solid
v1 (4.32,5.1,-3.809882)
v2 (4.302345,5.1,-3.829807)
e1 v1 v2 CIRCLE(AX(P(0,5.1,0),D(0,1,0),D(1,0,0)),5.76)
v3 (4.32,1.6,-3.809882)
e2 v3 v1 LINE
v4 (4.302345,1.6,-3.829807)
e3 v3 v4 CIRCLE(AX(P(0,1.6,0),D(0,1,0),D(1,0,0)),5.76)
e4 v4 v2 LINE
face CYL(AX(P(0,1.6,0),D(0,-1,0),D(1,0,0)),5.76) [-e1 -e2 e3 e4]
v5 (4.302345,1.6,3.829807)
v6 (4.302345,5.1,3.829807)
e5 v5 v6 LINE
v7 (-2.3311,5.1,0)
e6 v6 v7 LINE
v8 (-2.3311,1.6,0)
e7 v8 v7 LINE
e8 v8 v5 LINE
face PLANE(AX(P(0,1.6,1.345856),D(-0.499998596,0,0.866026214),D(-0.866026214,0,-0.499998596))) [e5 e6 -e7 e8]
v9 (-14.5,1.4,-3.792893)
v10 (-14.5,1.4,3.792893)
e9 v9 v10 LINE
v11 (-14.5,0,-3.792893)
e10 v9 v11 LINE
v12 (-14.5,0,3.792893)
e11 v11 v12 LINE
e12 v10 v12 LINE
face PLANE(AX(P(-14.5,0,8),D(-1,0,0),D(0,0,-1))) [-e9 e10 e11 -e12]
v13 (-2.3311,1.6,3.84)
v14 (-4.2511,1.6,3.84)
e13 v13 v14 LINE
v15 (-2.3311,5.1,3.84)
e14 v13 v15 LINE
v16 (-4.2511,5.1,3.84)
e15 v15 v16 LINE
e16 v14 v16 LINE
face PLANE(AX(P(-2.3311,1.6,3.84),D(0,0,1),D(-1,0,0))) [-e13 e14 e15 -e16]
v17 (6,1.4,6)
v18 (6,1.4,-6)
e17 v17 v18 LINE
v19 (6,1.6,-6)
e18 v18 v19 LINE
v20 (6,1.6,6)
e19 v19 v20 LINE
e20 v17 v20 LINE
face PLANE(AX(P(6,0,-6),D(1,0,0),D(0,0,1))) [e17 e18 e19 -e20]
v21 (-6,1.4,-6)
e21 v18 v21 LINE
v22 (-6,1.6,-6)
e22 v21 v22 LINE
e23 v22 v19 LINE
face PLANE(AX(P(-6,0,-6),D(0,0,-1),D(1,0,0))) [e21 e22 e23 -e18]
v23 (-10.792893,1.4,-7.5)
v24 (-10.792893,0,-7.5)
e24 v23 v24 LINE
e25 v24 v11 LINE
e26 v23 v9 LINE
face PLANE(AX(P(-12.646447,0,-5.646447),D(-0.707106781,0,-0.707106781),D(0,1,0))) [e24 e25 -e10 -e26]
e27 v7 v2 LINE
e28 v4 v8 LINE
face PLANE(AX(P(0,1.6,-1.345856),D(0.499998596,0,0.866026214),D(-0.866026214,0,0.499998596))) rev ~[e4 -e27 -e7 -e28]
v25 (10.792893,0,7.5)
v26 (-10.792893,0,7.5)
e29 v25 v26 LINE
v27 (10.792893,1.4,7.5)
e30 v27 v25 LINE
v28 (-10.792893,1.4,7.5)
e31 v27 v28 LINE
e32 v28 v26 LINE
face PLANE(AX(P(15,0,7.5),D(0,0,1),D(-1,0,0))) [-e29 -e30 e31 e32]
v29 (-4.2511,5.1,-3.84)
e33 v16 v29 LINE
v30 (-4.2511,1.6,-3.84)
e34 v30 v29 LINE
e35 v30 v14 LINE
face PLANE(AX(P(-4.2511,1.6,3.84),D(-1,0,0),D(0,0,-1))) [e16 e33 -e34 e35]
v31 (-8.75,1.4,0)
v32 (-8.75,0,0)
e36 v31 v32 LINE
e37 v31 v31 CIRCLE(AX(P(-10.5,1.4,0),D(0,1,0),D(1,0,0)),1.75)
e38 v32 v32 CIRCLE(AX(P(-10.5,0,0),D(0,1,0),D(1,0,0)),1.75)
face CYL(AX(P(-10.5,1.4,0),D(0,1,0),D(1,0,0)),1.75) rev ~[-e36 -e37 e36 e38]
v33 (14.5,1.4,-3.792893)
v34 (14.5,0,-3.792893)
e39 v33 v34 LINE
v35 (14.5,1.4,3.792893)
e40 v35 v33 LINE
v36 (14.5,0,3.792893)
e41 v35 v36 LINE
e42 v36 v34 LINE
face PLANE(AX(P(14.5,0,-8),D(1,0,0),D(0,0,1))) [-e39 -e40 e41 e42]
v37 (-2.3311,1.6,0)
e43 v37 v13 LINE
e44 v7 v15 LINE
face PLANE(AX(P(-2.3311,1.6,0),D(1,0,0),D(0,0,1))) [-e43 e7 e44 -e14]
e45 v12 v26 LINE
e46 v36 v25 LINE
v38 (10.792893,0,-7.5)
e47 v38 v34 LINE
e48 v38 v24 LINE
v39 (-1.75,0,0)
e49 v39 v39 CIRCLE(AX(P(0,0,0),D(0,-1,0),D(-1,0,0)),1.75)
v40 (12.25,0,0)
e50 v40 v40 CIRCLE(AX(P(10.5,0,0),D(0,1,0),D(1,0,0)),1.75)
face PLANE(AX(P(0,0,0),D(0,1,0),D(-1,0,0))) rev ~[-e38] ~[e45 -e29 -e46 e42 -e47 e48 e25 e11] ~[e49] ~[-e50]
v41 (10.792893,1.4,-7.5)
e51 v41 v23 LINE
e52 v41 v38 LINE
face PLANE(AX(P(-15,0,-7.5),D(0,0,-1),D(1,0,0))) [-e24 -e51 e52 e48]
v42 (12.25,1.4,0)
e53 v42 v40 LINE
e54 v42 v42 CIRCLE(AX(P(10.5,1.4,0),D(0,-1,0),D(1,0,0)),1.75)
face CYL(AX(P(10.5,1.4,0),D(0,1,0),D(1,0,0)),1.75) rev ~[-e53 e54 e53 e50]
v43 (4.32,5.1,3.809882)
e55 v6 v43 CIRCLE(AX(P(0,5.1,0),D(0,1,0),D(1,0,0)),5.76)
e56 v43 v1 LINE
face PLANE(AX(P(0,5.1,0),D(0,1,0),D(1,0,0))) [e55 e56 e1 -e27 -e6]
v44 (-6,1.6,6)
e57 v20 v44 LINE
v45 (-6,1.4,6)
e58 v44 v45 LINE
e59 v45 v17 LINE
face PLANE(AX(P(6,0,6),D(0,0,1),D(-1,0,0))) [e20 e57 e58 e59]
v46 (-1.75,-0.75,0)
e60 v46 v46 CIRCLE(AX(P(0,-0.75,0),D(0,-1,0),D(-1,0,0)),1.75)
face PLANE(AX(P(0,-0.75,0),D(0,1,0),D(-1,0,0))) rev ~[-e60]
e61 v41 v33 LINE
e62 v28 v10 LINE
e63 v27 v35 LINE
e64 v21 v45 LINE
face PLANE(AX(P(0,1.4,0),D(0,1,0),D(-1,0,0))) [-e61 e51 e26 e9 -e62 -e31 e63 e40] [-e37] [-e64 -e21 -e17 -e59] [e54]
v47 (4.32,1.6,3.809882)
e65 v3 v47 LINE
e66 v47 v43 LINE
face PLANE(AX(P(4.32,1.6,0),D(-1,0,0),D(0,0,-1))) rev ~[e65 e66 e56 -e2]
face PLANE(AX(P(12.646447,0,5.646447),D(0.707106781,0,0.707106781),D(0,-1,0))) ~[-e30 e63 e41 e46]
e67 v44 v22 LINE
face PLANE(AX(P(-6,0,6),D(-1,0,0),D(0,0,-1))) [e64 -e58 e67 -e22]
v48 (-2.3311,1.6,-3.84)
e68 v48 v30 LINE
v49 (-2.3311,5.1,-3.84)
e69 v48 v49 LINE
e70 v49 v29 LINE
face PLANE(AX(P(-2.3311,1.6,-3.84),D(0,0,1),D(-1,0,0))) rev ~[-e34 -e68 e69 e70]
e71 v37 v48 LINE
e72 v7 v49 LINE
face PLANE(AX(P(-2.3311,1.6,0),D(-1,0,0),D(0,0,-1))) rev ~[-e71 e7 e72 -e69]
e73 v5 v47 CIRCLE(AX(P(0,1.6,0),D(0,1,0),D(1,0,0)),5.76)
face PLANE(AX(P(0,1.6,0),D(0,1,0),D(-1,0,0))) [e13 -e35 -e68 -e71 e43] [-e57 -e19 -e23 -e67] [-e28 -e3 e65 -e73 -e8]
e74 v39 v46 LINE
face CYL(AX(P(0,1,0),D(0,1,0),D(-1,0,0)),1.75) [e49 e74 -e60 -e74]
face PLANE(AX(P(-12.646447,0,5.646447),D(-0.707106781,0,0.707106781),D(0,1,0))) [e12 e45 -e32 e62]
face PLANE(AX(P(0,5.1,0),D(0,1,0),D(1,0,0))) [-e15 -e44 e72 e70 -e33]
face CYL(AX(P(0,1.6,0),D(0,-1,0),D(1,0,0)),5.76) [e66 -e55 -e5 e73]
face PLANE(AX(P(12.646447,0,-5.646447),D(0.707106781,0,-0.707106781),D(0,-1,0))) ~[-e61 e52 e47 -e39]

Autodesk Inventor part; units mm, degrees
ref_plane "YZ Plane" through (0, 0, 0) normal (1, 0, 0) x (0, 1, 0)
ref_plane "XZ Plane" through (0, 0, 0) normal (0, 1, 0) x (-1, 0, 0)
ref_plane "XY Plane" through (0, 0, 0) normal (0, 0, 1) x (1, 0, 0)
sketch "Szkic1" plane through (0, 0, 0) normal (0, 1, 0) x (-1, 0, 0)
  line L0 (-15, 8) -> (15, 8)
  line L1 (15, 8) -> (15, -8)
  line L2 (15, -8) -> (-15, -8)
  line L3 (-15, -8) -> (-15, 8)
  line L4 (-15, 8) -> (15, -8) construction
  line L5 (15, 8) -> (-15, -8) construction
  line L6 (-6, 6) -> (6, 6)
  line L7 (6, 6) -> (6, -6)
  line L8 (6, -6) -> (-6, -6)
  line L9 (-6, -6) -> (-6, 6)
  line L10 (-6, 6) -> (6, -6) construction
  line L11 (6, 6) -> (-6, -6) construction
  circle A0 centre (0, 0) radius 1.75
  dimension "d0" = 30
  dimension "d1" = 16
  dimension "d2" = 12
  dimension "d3" = 12
  dimension "d4" = 3.5
extrude "Wyciągnięcie proste1" add sketch "Szkic1" along normal blind 1.4 contours L0 L1 L2 L3 | L6 L7 L8 L9 | A0
extrude "Wyciągnięcie proste2" add sketch "Szkic1" along normal blind 1.6 contours L6 L7 L8 L9 | A0
extrude "Wyciągnięcie proste3" cut sketch "Szkic1" along normal blind 1 contours A0
chamfer "Faza1" distance 4 angle 45 4 edges at (15, 0.7, 8) (15, 0.7, -8) (-15, 0.7, 8) (-15, 0.7, -8)
offset faces "Rozmiar1" outward -0.5 faces at (-3.6667, 0.4667, 8) (-12.3333, 0.4667, 6.6667) (12.3333, 0.4667, 6.6667) (15, 0.4667, 1.3333) (13.6667, 0.4667, -5.3333) (3.6667, 0.4667, -8) (-13.6667, 0.4667, -5.3333) (-15, 0.4667, -1.3333)
sketch "Szkic2" plane through (0, 1.4, 0) normal (0, 1, 0) x (1, 0, 0)
  line L0 (-6, -6) -> (6, -6) projected
  line L1 (-6, 6) -> (6, 6) projected
  line L2 (-6, -6) -> (6, -6)
  line L3 (6, -6) -> (6, 6)
  line L4 (6, 6) -> (-6, 6)
  line L5 (-6, 6) -> (-6, -6)
  line L6 (0, 0) -> (-10.5, 0)
  line L7 (-10.5, 0) -> (10.5, 0)
  circle A0 centre (10.5, 0) radius 1.75
  circle A1 centre (-10.5, 0) radius 1.75
  dimension "d16" = 10.5
  dimension "d17" = 21
  dimension "d18" = 3.5
  dimension "d19" = 3.5
extrude "Wyciągnięcie proste4" cut sketch "Szkic2" against normal blind 10 contours A0 | A1
sketch "Szkic4" plane through (0, 1.6, 0) normal (0, 1, 0) x (1, 0, 0)
  line L0 (-4.2511, -3.84) -> (-4.2511, 0)
  line L1 (5.76, 0) -> (4.32, 0)
  line L2 (-2.3311, 0) -> (-2.3311, 3.84)
  line L3 (4.32, 0) -> (4.32, 3.84)
  line L4 (0, -5.76) -> (0, 5.76)
  line L5 (0, 5.76) -> (0, -5.76)
  line L6 (5.76, -5.76) -> (-5.76, -5.76)
  line L7 (-5.76, -5.76) -> (5.76, -5.76)
  line L8 (4.32, 3.84) -> (-2.3311, 0)
  line L9 (5.76, -5.76) -> (5.76, 5.76)
  line L10 (5.76, 5.76) -> (5.76, -5.76)
  line L11 (5.76, 0) -> (-5.76, 0)
  line L12 (5.76, 5.76) -> (-5.76, 5.76)
  line L13 (-5.76, 5.76) -> (5.76, 5.76)
  line L14 (5.76, 5.76) -> (-5.76, 5.76)
  circle A0 centre (0, 0) radius 5.76
  line L15 (-5.76, -5.76) -> (-5.76, 5.76)
  line L16 (-5.76, 5.76) -> (-5.76, -5.76)
  line L17 (-5.76, 5.76) -> (-5.76, -5.76)
  line L18 (4.32, 0) -> (4.32, -3.84)
  line L19 (4.32, -3.84) -> (-2.3311, 0)
  line L20 (-2.3311, 0) -> (-2.3311, -3.84)
  line L21 (-4.2511, 3.84) -> (-4.2511, 0)
  line L22 (-2.3311, -3.84) -> (-4.2511, -3.84)
  line L23 (-2.3311, 3.84) -> (-4.2511, 3.84)
  line L24 (6, -6) -> (-6, -6) projected
  line L25 (6, 6) -> (-6, 6) projected
  line L26 (5.76, -5.76) -> (-5.76, -5.76)
  line L27 (-5.76, -5.76) -> (-5.76, 5.76)
  line L28 (-5.76, 5.76) -> (5.76, 5.76)
  line L29 (5.76, 5.76) -> (5.76, -5.76)
  point P0 (-16.6045, -17.9068)
  point P1 (5.76, -5.76)
  point P2 (-5.76, -5.76)
  point P3 (4.32, 3.8099)
  point P4 (4.3023, 3.8298)
  point P5 (4.3023, -3.8298)
  point P6 (4.32, -3.8099)
extrude "Wyciągnięcie proste5" add sketch "Szkic4" along normal blind 3.5 contours L0 L11 L20 L22 | L21 L23 L2 L11 | L8 L4 L11 | L11 L4 L19 | L8 A0 L3 L11 L4 | L11 L18 A0 L19 L4
move faces "Przesuń1" translate (0, -1.75, 0) faces at (-0.0229, 1, 0.3868)
properties part number "guzik"
